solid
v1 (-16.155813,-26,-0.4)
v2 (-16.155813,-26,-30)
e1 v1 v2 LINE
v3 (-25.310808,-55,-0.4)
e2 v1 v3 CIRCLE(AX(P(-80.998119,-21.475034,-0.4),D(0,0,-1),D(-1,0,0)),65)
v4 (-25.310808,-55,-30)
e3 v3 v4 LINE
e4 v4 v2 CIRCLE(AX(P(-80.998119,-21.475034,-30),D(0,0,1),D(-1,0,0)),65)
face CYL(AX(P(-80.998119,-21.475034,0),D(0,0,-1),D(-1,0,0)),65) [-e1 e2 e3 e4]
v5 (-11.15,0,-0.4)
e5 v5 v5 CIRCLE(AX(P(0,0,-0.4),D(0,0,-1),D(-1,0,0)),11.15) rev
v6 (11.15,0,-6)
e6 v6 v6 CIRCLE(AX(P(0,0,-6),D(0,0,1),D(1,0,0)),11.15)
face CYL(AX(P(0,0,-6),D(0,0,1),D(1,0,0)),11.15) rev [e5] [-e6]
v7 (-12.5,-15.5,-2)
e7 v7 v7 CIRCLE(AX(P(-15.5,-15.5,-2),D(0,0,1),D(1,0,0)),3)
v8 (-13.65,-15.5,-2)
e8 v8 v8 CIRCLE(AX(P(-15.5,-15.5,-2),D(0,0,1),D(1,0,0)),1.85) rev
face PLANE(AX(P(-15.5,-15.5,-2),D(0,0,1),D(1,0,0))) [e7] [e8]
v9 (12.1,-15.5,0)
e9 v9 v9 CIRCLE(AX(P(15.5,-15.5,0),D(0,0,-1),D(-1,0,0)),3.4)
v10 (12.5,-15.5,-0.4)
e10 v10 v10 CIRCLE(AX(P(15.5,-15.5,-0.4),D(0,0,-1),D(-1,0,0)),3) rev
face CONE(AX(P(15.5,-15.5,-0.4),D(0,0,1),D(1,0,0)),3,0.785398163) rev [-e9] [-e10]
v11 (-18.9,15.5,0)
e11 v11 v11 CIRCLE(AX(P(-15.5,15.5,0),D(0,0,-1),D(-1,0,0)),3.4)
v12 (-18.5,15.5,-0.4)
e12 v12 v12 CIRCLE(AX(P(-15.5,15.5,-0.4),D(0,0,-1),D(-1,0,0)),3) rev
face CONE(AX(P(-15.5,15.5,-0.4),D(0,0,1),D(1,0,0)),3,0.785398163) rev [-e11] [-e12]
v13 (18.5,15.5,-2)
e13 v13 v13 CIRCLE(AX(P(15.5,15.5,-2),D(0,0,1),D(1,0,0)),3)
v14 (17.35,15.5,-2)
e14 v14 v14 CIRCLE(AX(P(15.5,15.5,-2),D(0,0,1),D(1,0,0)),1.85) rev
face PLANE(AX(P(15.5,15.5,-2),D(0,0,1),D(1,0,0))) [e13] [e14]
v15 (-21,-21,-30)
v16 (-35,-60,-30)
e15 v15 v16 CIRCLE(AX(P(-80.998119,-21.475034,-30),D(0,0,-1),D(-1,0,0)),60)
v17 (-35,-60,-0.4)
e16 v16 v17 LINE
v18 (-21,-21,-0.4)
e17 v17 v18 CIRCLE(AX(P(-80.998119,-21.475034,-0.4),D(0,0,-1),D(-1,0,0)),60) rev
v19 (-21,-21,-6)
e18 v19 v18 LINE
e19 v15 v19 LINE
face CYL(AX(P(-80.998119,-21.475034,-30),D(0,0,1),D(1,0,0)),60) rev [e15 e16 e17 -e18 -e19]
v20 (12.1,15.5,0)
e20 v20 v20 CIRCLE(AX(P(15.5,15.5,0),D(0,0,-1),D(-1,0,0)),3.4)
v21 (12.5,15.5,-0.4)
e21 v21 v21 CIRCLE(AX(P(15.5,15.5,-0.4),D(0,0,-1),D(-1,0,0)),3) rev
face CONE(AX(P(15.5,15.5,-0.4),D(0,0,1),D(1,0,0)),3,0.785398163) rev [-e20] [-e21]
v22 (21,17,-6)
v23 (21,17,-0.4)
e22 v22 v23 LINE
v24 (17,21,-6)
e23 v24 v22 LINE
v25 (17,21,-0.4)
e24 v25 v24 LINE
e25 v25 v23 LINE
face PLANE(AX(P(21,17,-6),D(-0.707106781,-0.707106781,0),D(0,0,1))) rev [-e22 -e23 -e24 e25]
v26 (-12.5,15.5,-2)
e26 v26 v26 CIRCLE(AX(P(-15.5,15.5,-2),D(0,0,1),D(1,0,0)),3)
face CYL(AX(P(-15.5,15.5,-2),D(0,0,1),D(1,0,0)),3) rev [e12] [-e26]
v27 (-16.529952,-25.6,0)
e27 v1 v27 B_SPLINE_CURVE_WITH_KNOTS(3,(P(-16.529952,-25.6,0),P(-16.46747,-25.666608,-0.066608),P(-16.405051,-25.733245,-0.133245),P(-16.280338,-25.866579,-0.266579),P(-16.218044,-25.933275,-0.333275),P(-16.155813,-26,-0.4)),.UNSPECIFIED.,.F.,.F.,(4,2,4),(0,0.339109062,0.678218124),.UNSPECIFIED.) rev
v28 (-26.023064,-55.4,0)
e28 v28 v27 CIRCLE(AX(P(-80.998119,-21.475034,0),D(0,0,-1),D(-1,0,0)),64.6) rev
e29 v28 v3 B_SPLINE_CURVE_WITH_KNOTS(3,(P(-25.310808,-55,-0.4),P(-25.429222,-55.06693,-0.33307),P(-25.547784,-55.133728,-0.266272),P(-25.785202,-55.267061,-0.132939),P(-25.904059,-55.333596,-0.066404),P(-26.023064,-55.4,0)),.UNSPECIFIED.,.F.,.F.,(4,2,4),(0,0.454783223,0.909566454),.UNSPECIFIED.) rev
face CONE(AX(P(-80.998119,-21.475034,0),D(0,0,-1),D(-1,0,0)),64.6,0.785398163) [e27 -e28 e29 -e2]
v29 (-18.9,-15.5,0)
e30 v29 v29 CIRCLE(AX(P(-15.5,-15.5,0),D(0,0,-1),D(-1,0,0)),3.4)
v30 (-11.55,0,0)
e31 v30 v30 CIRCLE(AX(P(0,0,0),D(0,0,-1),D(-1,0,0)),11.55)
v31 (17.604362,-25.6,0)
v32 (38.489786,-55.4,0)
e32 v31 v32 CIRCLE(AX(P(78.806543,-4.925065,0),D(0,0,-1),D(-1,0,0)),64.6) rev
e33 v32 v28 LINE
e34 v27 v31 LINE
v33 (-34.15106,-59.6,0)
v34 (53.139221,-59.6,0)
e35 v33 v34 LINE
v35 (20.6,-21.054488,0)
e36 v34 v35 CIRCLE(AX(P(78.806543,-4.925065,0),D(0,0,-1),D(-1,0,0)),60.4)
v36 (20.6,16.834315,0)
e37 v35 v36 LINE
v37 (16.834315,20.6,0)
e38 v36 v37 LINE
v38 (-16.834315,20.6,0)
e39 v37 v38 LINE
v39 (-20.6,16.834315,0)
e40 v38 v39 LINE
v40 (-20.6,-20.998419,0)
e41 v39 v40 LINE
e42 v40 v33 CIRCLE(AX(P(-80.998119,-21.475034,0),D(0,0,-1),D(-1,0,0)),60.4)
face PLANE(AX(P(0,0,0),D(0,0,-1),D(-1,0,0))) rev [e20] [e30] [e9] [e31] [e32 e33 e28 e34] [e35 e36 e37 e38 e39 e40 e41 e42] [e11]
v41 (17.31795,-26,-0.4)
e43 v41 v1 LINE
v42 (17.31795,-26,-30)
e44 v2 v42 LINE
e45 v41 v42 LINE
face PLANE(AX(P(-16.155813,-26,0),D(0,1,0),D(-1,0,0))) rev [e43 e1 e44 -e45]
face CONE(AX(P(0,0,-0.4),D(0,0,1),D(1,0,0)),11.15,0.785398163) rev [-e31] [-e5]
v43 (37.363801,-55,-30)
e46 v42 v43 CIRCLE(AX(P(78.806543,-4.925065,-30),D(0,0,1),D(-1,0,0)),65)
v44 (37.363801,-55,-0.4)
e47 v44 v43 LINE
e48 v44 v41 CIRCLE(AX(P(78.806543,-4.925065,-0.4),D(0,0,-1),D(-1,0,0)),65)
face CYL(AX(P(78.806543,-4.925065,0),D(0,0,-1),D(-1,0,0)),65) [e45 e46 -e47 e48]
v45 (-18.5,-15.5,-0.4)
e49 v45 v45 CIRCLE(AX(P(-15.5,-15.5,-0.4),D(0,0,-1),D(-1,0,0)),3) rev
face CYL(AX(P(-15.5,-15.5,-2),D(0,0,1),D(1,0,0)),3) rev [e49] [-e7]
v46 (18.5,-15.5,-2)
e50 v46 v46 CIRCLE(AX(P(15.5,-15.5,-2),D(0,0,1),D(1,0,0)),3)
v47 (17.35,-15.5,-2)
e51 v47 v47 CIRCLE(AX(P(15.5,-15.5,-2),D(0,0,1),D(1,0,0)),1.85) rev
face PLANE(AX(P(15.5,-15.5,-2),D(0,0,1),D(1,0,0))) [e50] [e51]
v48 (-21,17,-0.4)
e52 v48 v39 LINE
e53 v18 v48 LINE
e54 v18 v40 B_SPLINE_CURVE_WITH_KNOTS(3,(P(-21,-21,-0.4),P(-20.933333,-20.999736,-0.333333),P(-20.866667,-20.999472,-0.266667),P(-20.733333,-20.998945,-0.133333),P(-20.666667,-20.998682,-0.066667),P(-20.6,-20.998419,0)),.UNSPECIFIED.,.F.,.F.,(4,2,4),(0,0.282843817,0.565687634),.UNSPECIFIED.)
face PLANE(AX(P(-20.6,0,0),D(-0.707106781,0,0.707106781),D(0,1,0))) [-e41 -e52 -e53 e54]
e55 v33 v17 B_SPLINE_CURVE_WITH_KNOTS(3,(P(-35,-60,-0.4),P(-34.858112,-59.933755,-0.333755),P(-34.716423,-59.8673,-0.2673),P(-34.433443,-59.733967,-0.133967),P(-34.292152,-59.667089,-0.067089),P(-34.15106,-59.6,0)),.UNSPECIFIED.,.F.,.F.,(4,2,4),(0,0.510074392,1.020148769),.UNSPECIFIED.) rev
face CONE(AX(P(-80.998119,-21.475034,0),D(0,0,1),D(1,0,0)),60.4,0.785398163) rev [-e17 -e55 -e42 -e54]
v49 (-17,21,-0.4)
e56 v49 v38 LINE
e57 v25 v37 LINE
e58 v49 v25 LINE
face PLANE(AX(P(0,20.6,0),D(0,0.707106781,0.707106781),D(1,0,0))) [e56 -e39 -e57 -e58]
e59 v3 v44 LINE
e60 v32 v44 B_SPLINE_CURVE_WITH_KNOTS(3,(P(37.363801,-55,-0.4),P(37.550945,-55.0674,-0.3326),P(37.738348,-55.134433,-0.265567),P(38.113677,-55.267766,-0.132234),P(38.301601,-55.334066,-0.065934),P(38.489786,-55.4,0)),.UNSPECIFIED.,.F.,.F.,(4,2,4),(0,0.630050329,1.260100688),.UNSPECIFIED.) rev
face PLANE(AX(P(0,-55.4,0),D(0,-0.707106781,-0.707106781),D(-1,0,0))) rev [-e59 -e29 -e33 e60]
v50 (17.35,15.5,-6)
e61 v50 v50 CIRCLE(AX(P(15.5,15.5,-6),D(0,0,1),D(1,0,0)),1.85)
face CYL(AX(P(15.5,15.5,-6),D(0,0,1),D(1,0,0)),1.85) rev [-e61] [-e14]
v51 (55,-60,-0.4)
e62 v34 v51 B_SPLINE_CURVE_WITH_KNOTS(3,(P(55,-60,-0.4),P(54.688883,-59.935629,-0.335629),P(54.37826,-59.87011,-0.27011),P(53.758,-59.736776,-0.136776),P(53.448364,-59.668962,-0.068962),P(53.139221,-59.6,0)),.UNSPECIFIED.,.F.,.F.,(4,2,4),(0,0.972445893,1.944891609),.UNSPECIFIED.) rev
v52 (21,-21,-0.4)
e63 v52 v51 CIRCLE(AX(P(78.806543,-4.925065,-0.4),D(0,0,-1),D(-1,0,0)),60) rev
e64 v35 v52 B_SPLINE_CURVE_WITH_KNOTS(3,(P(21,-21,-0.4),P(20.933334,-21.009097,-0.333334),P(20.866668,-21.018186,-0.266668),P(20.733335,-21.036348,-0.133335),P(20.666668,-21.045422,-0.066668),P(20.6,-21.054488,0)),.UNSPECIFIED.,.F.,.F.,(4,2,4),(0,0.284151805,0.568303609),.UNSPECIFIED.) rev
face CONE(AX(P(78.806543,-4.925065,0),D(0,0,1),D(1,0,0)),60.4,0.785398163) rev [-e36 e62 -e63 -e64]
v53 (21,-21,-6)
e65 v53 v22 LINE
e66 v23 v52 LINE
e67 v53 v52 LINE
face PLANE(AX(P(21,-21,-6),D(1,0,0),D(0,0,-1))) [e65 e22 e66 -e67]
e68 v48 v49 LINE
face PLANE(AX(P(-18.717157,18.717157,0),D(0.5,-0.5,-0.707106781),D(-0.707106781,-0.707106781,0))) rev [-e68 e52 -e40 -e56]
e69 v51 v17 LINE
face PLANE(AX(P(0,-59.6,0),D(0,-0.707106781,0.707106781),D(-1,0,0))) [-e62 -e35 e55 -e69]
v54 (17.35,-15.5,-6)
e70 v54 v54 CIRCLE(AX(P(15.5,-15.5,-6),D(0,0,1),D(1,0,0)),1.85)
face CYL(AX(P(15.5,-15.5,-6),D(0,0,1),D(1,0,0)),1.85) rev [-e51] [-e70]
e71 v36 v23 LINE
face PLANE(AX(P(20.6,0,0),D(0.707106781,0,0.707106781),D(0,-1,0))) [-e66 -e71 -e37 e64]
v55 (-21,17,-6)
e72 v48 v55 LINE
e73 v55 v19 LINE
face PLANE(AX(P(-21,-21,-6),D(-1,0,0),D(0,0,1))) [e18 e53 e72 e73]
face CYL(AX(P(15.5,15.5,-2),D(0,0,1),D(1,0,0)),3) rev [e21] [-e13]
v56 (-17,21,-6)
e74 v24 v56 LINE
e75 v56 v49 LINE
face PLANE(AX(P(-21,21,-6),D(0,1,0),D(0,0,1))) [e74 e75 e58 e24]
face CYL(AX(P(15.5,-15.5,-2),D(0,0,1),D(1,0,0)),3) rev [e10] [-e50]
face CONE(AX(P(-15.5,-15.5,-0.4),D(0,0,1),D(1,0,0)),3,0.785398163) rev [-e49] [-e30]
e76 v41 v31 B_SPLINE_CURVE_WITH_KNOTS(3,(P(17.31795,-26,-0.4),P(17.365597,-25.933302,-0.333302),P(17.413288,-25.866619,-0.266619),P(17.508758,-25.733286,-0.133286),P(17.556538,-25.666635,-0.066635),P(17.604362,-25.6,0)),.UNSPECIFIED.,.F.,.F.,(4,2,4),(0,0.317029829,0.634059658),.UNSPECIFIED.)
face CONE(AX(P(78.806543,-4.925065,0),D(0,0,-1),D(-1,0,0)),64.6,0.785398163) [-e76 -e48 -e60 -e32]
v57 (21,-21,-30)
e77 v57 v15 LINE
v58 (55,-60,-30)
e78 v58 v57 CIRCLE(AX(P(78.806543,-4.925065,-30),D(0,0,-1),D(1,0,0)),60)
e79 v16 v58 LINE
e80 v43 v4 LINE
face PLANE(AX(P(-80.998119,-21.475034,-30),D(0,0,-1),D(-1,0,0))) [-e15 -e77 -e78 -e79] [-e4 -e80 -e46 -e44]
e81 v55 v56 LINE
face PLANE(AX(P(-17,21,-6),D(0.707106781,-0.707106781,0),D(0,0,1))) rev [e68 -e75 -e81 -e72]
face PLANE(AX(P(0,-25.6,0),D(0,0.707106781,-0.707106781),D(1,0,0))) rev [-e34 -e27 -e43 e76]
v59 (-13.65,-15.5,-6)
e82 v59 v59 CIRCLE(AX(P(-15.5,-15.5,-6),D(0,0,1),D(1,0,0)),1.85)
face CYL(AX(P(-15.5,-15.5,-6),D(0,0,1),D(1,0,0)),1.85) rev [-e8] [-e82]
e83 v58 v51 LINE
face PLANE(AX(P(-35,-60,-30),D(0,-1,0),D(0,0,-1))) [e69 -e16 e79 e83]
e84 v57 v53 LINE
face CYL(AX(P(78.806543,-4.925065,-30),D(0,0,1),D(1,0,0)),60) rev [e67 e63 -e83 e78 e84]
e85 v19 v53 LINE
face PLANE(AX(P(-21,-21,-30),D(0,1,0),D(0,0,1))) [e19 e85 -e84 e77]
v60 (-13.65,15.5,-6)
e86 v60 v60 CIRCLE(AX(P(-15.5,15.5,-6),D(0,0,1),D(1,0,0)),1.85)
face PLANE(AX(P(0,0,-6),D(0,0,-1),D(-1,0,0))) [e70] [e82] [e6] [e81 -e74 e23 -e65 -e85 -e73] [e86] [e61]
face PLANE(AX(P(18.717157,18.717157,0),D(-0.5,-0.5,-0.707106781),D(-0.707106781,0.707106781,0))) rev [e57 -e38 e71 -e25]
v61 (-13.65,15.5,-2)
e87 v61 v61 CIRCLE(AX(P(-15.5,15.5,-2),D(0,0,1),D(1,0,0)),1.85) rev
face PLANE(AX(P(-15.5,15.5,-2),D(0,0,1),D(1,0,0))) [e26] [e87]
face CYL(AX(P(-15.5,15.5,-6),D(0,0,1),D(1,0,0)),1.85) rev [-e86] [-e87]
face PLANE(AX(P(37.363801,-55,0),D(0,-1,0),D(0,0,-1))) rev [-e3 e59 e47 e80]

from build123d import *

# Parameters (mm, degrees)
SKETCH1_W           = 42
SKETCH1_H           = 42
SKETCH1_R           = 11.15
SKETCH1_R_2         = 1.85
BOSS_EXTRUDE1_DEPTH = 6
BOSS_EXTRUDE2_DEPTH = 30
CUT_EXTRUDE1_DEPTH  = 87.746757864
SKETCH4_R           = 3
CUT_EXTRUDE2_DEPTH  = 2
CHAMFER1_SIZE       = 4
CHAMFER2_SIZE       = 0.4


with BuildPart() as part:
    # Sketch1 → Boss-Extrude1 (new body)
    with BuildSketch(Plane.XY):
        Rectangle(SKETCH1_W, SKETCH1_H)
        Circle(SKETCH1_R, mode=Mode.SUBTRACT)
        with Locations((15.5, 15.5)):
            Circle(SKETCH1_R_2, mode=Mode.SUBTRACT)
        with Locations((-15.5, 15.5)):
            Circle(SKETCH1_R_2, mode=Mode.SUBTRACT)
        with Locations((-15.5, -15.5)):
            Circle(SKETCH1_R_2, mode=Mode.SUBTRACT)
        with Locations((15.5, -15.5)):
            Circle(SKETCH1_R_2, mode=Mode.SUBTRACT)
    extrude(amount=-BOSS_EXTRUDE1_DEPTH)

    # Sketch2 → Boss-Extrude2 (add)
    with BuildSketch(Plane.XY):
        with BuildLine():
            Line((-35, -60), (55, -60))
            ThreePointArc((55, -60), (33.580179579, -44.353176778), (21, -21))
            Line((21, -21), (-21, -21))
            ThreePointArc((-21, -21), (-24.526439247, -41.746919245), (-35, -60))
        make_face()
    extrude(amount=-BOSS_EXTRUDE2_DEPTH)

    # Sketch3 → Cut-Extrude1 (cut, through all)
    with BuildSketch(Plane(origin=(0, 0, -30), x_dir=(-1, 0, 0), z_dir=(0, 0, -1))):
        with BuildLine():
            Line((-37.363801429, -55), (25.310808042, -55))
            ThreePointArc((25.310808042, -55), (19.013466657, -41.042936644), (16.155813219, -26))
            Line((16.155813219, -26), (-17.317950087, -26))
            ThreePointArc((-17.317950087, -26), (-25.337253654, -41.884976236), (-37.363801429, -55))
        make_face()
    extrude(amount=-CUT_EXTRUDE1_DEPTH, mode=Mode.SUBTRACT)

    # Sketch4 → Cut-Extrude2 (cut)
    with BuildSketch(Plane.XY):
        with Locations((15.5, 15.5)):
            Circle(SKETCH4_R)
        with Locations((15.5, -15.5)):
            Circle(SKETCH4_R)
        with Locations((-15.5, -15.5)):
            Circle(SKETCH4_R)
        with Locations((-15.5, 15.5)):
            Circle(SKETCH4_R)
    extrude(amount=-CUT_EXTRUDE2_DEPTH, mode=Mode.SUBTRACT)

    # Chamfer1
    chamfer1_edges = [part.edges().sort_by_distance(p)[0] for p in [
        (-21, 21, -3),
        (21, 21, -3),
    ]]
    chamfer(chamfer1_edges, length=CHAMFER1_SIZE)

    # Chamfer2
    chamfer2_edges = [part.edges().sort_by_distance(p)[0] for p in [
        (21, -2, 0),
    ]]
    chamfer(chamfer2_edges, length=CHAMFER2_SIZE)
    chamfer2_2_edges = [part.edges().sort_by_distance(p)[0] for p in [
        (18.8, 19.2, 0),
    ]]
    chamfer(chamfer2_2_edges, length=CHAMFER2_SIZE)
    chamfer2_3_edges = [part.edges().sort_by_distance(p)[0] for p in [
        (33.580179579, -44.353176778, 0),
    ]]
    chamfer(chamfer2_3_edges, length=CHAMFER2_SIZE)
    chamfer2_4_edges = [part.edges().sort_by_distance(p)[0] for p in [
        (-0.282842712, 21, 0),
    ]]
    chamfer(chamfer2_4_edges, length=CHAMFER2_SIZE)
    chamfer2_5_edges = [part.edges().sort_by_distance(p)[0] for p in [
        (9.504567043, -60, 0),
    ]]
    chamfer(chamfer2_5_edges, length=CHAMFER2_SIZE)
    chamfer2_6_edges = [part.edges().sort_by_distance(p)[0] for p in [
        (-19.2, 18.8, 0),
    ]]
    chamfer(chamfer2_6_edges, length=CHAMFER2_SIZE)
    chamfer2_7_edges = [part.edges().sort_by_distance(p)[0] for p in [
        (-24.439144818, -41.502075341, 0),
        (-21, -2.282842712, 0),
    ]]
    chamfer(chamfer2_7_edges, length=CHAMFER2_SIZE)
    chamfer2_8_edges = [part.edges().sort_by_distance(p)[0] for p in [
        (6.026496693, -55, 0),
    ]]
    chamfer(chamfer2_8_edges, length=CHAMFER2_SIZE)
    chamfer2_9_edges = [part.edges().sort_by_distance(p)[0] for p in [
        (-19.013466657, -41.042936644, 0),
    ]]
    chamfer(chamfer2_9_edges, length=CHAMFER2_SIZE)
    chamfer2_10_edges = [part.edges().sort_by_distance(p)[0] for p in [
        (25.337253654, -41.884976236, 0),
    ]]
    chamfer(chamfer2_10_edges, length=CHAMFER2_SIZE)
    chamfer2_11_edges = [part.edges().sort_by_distance(p)[0] for p in [
        (0.581068434, -26, 0),
    ]]
    chamfer(chamfer2_11_edges, length=CHAMFER2_SIZE)
    chamfer2_12_edges = [part.edges().sort_by_distance(p)[0] for p in [
        (-18.5, -15.5, 0),
    ]]
    chamfer(chamfer2_12_edges, length=CHAMFER2_SIZE)
    chamfer2_13_edges = [part.edges().sort_by_distance(p)[0] for p in [
        (-11.15, 0, 0),
    ]]
    chamfer(chamfer2_13_edges, length=CHAMFER2_SIZE)
    chamfer2_14_edges = [part.edges().sort_by_distance(p)[0] for p in [
        (-18.5, 15.5, 0),
    ]]
    chamfer(chamfer2_14_edges, length=CHAMFER2_SIZE)
    chamfer2_15_edges = [part.edges().sort_by_distance(p)[0] for p in [
        (12.5, -15.5, 0),
    ]]
    chamfer(chamfer2_15_edges, length=CHAMFER2_SIZE)
    chamfer2_16_edges = [part.edges().sort_by_distance(p)[0] for p in [
        (12.5, 15.5, 0),
    ]]
    chamfer(chamfer2_16_edges, length=CHAMFER2_SIZE)


solid = part.part
